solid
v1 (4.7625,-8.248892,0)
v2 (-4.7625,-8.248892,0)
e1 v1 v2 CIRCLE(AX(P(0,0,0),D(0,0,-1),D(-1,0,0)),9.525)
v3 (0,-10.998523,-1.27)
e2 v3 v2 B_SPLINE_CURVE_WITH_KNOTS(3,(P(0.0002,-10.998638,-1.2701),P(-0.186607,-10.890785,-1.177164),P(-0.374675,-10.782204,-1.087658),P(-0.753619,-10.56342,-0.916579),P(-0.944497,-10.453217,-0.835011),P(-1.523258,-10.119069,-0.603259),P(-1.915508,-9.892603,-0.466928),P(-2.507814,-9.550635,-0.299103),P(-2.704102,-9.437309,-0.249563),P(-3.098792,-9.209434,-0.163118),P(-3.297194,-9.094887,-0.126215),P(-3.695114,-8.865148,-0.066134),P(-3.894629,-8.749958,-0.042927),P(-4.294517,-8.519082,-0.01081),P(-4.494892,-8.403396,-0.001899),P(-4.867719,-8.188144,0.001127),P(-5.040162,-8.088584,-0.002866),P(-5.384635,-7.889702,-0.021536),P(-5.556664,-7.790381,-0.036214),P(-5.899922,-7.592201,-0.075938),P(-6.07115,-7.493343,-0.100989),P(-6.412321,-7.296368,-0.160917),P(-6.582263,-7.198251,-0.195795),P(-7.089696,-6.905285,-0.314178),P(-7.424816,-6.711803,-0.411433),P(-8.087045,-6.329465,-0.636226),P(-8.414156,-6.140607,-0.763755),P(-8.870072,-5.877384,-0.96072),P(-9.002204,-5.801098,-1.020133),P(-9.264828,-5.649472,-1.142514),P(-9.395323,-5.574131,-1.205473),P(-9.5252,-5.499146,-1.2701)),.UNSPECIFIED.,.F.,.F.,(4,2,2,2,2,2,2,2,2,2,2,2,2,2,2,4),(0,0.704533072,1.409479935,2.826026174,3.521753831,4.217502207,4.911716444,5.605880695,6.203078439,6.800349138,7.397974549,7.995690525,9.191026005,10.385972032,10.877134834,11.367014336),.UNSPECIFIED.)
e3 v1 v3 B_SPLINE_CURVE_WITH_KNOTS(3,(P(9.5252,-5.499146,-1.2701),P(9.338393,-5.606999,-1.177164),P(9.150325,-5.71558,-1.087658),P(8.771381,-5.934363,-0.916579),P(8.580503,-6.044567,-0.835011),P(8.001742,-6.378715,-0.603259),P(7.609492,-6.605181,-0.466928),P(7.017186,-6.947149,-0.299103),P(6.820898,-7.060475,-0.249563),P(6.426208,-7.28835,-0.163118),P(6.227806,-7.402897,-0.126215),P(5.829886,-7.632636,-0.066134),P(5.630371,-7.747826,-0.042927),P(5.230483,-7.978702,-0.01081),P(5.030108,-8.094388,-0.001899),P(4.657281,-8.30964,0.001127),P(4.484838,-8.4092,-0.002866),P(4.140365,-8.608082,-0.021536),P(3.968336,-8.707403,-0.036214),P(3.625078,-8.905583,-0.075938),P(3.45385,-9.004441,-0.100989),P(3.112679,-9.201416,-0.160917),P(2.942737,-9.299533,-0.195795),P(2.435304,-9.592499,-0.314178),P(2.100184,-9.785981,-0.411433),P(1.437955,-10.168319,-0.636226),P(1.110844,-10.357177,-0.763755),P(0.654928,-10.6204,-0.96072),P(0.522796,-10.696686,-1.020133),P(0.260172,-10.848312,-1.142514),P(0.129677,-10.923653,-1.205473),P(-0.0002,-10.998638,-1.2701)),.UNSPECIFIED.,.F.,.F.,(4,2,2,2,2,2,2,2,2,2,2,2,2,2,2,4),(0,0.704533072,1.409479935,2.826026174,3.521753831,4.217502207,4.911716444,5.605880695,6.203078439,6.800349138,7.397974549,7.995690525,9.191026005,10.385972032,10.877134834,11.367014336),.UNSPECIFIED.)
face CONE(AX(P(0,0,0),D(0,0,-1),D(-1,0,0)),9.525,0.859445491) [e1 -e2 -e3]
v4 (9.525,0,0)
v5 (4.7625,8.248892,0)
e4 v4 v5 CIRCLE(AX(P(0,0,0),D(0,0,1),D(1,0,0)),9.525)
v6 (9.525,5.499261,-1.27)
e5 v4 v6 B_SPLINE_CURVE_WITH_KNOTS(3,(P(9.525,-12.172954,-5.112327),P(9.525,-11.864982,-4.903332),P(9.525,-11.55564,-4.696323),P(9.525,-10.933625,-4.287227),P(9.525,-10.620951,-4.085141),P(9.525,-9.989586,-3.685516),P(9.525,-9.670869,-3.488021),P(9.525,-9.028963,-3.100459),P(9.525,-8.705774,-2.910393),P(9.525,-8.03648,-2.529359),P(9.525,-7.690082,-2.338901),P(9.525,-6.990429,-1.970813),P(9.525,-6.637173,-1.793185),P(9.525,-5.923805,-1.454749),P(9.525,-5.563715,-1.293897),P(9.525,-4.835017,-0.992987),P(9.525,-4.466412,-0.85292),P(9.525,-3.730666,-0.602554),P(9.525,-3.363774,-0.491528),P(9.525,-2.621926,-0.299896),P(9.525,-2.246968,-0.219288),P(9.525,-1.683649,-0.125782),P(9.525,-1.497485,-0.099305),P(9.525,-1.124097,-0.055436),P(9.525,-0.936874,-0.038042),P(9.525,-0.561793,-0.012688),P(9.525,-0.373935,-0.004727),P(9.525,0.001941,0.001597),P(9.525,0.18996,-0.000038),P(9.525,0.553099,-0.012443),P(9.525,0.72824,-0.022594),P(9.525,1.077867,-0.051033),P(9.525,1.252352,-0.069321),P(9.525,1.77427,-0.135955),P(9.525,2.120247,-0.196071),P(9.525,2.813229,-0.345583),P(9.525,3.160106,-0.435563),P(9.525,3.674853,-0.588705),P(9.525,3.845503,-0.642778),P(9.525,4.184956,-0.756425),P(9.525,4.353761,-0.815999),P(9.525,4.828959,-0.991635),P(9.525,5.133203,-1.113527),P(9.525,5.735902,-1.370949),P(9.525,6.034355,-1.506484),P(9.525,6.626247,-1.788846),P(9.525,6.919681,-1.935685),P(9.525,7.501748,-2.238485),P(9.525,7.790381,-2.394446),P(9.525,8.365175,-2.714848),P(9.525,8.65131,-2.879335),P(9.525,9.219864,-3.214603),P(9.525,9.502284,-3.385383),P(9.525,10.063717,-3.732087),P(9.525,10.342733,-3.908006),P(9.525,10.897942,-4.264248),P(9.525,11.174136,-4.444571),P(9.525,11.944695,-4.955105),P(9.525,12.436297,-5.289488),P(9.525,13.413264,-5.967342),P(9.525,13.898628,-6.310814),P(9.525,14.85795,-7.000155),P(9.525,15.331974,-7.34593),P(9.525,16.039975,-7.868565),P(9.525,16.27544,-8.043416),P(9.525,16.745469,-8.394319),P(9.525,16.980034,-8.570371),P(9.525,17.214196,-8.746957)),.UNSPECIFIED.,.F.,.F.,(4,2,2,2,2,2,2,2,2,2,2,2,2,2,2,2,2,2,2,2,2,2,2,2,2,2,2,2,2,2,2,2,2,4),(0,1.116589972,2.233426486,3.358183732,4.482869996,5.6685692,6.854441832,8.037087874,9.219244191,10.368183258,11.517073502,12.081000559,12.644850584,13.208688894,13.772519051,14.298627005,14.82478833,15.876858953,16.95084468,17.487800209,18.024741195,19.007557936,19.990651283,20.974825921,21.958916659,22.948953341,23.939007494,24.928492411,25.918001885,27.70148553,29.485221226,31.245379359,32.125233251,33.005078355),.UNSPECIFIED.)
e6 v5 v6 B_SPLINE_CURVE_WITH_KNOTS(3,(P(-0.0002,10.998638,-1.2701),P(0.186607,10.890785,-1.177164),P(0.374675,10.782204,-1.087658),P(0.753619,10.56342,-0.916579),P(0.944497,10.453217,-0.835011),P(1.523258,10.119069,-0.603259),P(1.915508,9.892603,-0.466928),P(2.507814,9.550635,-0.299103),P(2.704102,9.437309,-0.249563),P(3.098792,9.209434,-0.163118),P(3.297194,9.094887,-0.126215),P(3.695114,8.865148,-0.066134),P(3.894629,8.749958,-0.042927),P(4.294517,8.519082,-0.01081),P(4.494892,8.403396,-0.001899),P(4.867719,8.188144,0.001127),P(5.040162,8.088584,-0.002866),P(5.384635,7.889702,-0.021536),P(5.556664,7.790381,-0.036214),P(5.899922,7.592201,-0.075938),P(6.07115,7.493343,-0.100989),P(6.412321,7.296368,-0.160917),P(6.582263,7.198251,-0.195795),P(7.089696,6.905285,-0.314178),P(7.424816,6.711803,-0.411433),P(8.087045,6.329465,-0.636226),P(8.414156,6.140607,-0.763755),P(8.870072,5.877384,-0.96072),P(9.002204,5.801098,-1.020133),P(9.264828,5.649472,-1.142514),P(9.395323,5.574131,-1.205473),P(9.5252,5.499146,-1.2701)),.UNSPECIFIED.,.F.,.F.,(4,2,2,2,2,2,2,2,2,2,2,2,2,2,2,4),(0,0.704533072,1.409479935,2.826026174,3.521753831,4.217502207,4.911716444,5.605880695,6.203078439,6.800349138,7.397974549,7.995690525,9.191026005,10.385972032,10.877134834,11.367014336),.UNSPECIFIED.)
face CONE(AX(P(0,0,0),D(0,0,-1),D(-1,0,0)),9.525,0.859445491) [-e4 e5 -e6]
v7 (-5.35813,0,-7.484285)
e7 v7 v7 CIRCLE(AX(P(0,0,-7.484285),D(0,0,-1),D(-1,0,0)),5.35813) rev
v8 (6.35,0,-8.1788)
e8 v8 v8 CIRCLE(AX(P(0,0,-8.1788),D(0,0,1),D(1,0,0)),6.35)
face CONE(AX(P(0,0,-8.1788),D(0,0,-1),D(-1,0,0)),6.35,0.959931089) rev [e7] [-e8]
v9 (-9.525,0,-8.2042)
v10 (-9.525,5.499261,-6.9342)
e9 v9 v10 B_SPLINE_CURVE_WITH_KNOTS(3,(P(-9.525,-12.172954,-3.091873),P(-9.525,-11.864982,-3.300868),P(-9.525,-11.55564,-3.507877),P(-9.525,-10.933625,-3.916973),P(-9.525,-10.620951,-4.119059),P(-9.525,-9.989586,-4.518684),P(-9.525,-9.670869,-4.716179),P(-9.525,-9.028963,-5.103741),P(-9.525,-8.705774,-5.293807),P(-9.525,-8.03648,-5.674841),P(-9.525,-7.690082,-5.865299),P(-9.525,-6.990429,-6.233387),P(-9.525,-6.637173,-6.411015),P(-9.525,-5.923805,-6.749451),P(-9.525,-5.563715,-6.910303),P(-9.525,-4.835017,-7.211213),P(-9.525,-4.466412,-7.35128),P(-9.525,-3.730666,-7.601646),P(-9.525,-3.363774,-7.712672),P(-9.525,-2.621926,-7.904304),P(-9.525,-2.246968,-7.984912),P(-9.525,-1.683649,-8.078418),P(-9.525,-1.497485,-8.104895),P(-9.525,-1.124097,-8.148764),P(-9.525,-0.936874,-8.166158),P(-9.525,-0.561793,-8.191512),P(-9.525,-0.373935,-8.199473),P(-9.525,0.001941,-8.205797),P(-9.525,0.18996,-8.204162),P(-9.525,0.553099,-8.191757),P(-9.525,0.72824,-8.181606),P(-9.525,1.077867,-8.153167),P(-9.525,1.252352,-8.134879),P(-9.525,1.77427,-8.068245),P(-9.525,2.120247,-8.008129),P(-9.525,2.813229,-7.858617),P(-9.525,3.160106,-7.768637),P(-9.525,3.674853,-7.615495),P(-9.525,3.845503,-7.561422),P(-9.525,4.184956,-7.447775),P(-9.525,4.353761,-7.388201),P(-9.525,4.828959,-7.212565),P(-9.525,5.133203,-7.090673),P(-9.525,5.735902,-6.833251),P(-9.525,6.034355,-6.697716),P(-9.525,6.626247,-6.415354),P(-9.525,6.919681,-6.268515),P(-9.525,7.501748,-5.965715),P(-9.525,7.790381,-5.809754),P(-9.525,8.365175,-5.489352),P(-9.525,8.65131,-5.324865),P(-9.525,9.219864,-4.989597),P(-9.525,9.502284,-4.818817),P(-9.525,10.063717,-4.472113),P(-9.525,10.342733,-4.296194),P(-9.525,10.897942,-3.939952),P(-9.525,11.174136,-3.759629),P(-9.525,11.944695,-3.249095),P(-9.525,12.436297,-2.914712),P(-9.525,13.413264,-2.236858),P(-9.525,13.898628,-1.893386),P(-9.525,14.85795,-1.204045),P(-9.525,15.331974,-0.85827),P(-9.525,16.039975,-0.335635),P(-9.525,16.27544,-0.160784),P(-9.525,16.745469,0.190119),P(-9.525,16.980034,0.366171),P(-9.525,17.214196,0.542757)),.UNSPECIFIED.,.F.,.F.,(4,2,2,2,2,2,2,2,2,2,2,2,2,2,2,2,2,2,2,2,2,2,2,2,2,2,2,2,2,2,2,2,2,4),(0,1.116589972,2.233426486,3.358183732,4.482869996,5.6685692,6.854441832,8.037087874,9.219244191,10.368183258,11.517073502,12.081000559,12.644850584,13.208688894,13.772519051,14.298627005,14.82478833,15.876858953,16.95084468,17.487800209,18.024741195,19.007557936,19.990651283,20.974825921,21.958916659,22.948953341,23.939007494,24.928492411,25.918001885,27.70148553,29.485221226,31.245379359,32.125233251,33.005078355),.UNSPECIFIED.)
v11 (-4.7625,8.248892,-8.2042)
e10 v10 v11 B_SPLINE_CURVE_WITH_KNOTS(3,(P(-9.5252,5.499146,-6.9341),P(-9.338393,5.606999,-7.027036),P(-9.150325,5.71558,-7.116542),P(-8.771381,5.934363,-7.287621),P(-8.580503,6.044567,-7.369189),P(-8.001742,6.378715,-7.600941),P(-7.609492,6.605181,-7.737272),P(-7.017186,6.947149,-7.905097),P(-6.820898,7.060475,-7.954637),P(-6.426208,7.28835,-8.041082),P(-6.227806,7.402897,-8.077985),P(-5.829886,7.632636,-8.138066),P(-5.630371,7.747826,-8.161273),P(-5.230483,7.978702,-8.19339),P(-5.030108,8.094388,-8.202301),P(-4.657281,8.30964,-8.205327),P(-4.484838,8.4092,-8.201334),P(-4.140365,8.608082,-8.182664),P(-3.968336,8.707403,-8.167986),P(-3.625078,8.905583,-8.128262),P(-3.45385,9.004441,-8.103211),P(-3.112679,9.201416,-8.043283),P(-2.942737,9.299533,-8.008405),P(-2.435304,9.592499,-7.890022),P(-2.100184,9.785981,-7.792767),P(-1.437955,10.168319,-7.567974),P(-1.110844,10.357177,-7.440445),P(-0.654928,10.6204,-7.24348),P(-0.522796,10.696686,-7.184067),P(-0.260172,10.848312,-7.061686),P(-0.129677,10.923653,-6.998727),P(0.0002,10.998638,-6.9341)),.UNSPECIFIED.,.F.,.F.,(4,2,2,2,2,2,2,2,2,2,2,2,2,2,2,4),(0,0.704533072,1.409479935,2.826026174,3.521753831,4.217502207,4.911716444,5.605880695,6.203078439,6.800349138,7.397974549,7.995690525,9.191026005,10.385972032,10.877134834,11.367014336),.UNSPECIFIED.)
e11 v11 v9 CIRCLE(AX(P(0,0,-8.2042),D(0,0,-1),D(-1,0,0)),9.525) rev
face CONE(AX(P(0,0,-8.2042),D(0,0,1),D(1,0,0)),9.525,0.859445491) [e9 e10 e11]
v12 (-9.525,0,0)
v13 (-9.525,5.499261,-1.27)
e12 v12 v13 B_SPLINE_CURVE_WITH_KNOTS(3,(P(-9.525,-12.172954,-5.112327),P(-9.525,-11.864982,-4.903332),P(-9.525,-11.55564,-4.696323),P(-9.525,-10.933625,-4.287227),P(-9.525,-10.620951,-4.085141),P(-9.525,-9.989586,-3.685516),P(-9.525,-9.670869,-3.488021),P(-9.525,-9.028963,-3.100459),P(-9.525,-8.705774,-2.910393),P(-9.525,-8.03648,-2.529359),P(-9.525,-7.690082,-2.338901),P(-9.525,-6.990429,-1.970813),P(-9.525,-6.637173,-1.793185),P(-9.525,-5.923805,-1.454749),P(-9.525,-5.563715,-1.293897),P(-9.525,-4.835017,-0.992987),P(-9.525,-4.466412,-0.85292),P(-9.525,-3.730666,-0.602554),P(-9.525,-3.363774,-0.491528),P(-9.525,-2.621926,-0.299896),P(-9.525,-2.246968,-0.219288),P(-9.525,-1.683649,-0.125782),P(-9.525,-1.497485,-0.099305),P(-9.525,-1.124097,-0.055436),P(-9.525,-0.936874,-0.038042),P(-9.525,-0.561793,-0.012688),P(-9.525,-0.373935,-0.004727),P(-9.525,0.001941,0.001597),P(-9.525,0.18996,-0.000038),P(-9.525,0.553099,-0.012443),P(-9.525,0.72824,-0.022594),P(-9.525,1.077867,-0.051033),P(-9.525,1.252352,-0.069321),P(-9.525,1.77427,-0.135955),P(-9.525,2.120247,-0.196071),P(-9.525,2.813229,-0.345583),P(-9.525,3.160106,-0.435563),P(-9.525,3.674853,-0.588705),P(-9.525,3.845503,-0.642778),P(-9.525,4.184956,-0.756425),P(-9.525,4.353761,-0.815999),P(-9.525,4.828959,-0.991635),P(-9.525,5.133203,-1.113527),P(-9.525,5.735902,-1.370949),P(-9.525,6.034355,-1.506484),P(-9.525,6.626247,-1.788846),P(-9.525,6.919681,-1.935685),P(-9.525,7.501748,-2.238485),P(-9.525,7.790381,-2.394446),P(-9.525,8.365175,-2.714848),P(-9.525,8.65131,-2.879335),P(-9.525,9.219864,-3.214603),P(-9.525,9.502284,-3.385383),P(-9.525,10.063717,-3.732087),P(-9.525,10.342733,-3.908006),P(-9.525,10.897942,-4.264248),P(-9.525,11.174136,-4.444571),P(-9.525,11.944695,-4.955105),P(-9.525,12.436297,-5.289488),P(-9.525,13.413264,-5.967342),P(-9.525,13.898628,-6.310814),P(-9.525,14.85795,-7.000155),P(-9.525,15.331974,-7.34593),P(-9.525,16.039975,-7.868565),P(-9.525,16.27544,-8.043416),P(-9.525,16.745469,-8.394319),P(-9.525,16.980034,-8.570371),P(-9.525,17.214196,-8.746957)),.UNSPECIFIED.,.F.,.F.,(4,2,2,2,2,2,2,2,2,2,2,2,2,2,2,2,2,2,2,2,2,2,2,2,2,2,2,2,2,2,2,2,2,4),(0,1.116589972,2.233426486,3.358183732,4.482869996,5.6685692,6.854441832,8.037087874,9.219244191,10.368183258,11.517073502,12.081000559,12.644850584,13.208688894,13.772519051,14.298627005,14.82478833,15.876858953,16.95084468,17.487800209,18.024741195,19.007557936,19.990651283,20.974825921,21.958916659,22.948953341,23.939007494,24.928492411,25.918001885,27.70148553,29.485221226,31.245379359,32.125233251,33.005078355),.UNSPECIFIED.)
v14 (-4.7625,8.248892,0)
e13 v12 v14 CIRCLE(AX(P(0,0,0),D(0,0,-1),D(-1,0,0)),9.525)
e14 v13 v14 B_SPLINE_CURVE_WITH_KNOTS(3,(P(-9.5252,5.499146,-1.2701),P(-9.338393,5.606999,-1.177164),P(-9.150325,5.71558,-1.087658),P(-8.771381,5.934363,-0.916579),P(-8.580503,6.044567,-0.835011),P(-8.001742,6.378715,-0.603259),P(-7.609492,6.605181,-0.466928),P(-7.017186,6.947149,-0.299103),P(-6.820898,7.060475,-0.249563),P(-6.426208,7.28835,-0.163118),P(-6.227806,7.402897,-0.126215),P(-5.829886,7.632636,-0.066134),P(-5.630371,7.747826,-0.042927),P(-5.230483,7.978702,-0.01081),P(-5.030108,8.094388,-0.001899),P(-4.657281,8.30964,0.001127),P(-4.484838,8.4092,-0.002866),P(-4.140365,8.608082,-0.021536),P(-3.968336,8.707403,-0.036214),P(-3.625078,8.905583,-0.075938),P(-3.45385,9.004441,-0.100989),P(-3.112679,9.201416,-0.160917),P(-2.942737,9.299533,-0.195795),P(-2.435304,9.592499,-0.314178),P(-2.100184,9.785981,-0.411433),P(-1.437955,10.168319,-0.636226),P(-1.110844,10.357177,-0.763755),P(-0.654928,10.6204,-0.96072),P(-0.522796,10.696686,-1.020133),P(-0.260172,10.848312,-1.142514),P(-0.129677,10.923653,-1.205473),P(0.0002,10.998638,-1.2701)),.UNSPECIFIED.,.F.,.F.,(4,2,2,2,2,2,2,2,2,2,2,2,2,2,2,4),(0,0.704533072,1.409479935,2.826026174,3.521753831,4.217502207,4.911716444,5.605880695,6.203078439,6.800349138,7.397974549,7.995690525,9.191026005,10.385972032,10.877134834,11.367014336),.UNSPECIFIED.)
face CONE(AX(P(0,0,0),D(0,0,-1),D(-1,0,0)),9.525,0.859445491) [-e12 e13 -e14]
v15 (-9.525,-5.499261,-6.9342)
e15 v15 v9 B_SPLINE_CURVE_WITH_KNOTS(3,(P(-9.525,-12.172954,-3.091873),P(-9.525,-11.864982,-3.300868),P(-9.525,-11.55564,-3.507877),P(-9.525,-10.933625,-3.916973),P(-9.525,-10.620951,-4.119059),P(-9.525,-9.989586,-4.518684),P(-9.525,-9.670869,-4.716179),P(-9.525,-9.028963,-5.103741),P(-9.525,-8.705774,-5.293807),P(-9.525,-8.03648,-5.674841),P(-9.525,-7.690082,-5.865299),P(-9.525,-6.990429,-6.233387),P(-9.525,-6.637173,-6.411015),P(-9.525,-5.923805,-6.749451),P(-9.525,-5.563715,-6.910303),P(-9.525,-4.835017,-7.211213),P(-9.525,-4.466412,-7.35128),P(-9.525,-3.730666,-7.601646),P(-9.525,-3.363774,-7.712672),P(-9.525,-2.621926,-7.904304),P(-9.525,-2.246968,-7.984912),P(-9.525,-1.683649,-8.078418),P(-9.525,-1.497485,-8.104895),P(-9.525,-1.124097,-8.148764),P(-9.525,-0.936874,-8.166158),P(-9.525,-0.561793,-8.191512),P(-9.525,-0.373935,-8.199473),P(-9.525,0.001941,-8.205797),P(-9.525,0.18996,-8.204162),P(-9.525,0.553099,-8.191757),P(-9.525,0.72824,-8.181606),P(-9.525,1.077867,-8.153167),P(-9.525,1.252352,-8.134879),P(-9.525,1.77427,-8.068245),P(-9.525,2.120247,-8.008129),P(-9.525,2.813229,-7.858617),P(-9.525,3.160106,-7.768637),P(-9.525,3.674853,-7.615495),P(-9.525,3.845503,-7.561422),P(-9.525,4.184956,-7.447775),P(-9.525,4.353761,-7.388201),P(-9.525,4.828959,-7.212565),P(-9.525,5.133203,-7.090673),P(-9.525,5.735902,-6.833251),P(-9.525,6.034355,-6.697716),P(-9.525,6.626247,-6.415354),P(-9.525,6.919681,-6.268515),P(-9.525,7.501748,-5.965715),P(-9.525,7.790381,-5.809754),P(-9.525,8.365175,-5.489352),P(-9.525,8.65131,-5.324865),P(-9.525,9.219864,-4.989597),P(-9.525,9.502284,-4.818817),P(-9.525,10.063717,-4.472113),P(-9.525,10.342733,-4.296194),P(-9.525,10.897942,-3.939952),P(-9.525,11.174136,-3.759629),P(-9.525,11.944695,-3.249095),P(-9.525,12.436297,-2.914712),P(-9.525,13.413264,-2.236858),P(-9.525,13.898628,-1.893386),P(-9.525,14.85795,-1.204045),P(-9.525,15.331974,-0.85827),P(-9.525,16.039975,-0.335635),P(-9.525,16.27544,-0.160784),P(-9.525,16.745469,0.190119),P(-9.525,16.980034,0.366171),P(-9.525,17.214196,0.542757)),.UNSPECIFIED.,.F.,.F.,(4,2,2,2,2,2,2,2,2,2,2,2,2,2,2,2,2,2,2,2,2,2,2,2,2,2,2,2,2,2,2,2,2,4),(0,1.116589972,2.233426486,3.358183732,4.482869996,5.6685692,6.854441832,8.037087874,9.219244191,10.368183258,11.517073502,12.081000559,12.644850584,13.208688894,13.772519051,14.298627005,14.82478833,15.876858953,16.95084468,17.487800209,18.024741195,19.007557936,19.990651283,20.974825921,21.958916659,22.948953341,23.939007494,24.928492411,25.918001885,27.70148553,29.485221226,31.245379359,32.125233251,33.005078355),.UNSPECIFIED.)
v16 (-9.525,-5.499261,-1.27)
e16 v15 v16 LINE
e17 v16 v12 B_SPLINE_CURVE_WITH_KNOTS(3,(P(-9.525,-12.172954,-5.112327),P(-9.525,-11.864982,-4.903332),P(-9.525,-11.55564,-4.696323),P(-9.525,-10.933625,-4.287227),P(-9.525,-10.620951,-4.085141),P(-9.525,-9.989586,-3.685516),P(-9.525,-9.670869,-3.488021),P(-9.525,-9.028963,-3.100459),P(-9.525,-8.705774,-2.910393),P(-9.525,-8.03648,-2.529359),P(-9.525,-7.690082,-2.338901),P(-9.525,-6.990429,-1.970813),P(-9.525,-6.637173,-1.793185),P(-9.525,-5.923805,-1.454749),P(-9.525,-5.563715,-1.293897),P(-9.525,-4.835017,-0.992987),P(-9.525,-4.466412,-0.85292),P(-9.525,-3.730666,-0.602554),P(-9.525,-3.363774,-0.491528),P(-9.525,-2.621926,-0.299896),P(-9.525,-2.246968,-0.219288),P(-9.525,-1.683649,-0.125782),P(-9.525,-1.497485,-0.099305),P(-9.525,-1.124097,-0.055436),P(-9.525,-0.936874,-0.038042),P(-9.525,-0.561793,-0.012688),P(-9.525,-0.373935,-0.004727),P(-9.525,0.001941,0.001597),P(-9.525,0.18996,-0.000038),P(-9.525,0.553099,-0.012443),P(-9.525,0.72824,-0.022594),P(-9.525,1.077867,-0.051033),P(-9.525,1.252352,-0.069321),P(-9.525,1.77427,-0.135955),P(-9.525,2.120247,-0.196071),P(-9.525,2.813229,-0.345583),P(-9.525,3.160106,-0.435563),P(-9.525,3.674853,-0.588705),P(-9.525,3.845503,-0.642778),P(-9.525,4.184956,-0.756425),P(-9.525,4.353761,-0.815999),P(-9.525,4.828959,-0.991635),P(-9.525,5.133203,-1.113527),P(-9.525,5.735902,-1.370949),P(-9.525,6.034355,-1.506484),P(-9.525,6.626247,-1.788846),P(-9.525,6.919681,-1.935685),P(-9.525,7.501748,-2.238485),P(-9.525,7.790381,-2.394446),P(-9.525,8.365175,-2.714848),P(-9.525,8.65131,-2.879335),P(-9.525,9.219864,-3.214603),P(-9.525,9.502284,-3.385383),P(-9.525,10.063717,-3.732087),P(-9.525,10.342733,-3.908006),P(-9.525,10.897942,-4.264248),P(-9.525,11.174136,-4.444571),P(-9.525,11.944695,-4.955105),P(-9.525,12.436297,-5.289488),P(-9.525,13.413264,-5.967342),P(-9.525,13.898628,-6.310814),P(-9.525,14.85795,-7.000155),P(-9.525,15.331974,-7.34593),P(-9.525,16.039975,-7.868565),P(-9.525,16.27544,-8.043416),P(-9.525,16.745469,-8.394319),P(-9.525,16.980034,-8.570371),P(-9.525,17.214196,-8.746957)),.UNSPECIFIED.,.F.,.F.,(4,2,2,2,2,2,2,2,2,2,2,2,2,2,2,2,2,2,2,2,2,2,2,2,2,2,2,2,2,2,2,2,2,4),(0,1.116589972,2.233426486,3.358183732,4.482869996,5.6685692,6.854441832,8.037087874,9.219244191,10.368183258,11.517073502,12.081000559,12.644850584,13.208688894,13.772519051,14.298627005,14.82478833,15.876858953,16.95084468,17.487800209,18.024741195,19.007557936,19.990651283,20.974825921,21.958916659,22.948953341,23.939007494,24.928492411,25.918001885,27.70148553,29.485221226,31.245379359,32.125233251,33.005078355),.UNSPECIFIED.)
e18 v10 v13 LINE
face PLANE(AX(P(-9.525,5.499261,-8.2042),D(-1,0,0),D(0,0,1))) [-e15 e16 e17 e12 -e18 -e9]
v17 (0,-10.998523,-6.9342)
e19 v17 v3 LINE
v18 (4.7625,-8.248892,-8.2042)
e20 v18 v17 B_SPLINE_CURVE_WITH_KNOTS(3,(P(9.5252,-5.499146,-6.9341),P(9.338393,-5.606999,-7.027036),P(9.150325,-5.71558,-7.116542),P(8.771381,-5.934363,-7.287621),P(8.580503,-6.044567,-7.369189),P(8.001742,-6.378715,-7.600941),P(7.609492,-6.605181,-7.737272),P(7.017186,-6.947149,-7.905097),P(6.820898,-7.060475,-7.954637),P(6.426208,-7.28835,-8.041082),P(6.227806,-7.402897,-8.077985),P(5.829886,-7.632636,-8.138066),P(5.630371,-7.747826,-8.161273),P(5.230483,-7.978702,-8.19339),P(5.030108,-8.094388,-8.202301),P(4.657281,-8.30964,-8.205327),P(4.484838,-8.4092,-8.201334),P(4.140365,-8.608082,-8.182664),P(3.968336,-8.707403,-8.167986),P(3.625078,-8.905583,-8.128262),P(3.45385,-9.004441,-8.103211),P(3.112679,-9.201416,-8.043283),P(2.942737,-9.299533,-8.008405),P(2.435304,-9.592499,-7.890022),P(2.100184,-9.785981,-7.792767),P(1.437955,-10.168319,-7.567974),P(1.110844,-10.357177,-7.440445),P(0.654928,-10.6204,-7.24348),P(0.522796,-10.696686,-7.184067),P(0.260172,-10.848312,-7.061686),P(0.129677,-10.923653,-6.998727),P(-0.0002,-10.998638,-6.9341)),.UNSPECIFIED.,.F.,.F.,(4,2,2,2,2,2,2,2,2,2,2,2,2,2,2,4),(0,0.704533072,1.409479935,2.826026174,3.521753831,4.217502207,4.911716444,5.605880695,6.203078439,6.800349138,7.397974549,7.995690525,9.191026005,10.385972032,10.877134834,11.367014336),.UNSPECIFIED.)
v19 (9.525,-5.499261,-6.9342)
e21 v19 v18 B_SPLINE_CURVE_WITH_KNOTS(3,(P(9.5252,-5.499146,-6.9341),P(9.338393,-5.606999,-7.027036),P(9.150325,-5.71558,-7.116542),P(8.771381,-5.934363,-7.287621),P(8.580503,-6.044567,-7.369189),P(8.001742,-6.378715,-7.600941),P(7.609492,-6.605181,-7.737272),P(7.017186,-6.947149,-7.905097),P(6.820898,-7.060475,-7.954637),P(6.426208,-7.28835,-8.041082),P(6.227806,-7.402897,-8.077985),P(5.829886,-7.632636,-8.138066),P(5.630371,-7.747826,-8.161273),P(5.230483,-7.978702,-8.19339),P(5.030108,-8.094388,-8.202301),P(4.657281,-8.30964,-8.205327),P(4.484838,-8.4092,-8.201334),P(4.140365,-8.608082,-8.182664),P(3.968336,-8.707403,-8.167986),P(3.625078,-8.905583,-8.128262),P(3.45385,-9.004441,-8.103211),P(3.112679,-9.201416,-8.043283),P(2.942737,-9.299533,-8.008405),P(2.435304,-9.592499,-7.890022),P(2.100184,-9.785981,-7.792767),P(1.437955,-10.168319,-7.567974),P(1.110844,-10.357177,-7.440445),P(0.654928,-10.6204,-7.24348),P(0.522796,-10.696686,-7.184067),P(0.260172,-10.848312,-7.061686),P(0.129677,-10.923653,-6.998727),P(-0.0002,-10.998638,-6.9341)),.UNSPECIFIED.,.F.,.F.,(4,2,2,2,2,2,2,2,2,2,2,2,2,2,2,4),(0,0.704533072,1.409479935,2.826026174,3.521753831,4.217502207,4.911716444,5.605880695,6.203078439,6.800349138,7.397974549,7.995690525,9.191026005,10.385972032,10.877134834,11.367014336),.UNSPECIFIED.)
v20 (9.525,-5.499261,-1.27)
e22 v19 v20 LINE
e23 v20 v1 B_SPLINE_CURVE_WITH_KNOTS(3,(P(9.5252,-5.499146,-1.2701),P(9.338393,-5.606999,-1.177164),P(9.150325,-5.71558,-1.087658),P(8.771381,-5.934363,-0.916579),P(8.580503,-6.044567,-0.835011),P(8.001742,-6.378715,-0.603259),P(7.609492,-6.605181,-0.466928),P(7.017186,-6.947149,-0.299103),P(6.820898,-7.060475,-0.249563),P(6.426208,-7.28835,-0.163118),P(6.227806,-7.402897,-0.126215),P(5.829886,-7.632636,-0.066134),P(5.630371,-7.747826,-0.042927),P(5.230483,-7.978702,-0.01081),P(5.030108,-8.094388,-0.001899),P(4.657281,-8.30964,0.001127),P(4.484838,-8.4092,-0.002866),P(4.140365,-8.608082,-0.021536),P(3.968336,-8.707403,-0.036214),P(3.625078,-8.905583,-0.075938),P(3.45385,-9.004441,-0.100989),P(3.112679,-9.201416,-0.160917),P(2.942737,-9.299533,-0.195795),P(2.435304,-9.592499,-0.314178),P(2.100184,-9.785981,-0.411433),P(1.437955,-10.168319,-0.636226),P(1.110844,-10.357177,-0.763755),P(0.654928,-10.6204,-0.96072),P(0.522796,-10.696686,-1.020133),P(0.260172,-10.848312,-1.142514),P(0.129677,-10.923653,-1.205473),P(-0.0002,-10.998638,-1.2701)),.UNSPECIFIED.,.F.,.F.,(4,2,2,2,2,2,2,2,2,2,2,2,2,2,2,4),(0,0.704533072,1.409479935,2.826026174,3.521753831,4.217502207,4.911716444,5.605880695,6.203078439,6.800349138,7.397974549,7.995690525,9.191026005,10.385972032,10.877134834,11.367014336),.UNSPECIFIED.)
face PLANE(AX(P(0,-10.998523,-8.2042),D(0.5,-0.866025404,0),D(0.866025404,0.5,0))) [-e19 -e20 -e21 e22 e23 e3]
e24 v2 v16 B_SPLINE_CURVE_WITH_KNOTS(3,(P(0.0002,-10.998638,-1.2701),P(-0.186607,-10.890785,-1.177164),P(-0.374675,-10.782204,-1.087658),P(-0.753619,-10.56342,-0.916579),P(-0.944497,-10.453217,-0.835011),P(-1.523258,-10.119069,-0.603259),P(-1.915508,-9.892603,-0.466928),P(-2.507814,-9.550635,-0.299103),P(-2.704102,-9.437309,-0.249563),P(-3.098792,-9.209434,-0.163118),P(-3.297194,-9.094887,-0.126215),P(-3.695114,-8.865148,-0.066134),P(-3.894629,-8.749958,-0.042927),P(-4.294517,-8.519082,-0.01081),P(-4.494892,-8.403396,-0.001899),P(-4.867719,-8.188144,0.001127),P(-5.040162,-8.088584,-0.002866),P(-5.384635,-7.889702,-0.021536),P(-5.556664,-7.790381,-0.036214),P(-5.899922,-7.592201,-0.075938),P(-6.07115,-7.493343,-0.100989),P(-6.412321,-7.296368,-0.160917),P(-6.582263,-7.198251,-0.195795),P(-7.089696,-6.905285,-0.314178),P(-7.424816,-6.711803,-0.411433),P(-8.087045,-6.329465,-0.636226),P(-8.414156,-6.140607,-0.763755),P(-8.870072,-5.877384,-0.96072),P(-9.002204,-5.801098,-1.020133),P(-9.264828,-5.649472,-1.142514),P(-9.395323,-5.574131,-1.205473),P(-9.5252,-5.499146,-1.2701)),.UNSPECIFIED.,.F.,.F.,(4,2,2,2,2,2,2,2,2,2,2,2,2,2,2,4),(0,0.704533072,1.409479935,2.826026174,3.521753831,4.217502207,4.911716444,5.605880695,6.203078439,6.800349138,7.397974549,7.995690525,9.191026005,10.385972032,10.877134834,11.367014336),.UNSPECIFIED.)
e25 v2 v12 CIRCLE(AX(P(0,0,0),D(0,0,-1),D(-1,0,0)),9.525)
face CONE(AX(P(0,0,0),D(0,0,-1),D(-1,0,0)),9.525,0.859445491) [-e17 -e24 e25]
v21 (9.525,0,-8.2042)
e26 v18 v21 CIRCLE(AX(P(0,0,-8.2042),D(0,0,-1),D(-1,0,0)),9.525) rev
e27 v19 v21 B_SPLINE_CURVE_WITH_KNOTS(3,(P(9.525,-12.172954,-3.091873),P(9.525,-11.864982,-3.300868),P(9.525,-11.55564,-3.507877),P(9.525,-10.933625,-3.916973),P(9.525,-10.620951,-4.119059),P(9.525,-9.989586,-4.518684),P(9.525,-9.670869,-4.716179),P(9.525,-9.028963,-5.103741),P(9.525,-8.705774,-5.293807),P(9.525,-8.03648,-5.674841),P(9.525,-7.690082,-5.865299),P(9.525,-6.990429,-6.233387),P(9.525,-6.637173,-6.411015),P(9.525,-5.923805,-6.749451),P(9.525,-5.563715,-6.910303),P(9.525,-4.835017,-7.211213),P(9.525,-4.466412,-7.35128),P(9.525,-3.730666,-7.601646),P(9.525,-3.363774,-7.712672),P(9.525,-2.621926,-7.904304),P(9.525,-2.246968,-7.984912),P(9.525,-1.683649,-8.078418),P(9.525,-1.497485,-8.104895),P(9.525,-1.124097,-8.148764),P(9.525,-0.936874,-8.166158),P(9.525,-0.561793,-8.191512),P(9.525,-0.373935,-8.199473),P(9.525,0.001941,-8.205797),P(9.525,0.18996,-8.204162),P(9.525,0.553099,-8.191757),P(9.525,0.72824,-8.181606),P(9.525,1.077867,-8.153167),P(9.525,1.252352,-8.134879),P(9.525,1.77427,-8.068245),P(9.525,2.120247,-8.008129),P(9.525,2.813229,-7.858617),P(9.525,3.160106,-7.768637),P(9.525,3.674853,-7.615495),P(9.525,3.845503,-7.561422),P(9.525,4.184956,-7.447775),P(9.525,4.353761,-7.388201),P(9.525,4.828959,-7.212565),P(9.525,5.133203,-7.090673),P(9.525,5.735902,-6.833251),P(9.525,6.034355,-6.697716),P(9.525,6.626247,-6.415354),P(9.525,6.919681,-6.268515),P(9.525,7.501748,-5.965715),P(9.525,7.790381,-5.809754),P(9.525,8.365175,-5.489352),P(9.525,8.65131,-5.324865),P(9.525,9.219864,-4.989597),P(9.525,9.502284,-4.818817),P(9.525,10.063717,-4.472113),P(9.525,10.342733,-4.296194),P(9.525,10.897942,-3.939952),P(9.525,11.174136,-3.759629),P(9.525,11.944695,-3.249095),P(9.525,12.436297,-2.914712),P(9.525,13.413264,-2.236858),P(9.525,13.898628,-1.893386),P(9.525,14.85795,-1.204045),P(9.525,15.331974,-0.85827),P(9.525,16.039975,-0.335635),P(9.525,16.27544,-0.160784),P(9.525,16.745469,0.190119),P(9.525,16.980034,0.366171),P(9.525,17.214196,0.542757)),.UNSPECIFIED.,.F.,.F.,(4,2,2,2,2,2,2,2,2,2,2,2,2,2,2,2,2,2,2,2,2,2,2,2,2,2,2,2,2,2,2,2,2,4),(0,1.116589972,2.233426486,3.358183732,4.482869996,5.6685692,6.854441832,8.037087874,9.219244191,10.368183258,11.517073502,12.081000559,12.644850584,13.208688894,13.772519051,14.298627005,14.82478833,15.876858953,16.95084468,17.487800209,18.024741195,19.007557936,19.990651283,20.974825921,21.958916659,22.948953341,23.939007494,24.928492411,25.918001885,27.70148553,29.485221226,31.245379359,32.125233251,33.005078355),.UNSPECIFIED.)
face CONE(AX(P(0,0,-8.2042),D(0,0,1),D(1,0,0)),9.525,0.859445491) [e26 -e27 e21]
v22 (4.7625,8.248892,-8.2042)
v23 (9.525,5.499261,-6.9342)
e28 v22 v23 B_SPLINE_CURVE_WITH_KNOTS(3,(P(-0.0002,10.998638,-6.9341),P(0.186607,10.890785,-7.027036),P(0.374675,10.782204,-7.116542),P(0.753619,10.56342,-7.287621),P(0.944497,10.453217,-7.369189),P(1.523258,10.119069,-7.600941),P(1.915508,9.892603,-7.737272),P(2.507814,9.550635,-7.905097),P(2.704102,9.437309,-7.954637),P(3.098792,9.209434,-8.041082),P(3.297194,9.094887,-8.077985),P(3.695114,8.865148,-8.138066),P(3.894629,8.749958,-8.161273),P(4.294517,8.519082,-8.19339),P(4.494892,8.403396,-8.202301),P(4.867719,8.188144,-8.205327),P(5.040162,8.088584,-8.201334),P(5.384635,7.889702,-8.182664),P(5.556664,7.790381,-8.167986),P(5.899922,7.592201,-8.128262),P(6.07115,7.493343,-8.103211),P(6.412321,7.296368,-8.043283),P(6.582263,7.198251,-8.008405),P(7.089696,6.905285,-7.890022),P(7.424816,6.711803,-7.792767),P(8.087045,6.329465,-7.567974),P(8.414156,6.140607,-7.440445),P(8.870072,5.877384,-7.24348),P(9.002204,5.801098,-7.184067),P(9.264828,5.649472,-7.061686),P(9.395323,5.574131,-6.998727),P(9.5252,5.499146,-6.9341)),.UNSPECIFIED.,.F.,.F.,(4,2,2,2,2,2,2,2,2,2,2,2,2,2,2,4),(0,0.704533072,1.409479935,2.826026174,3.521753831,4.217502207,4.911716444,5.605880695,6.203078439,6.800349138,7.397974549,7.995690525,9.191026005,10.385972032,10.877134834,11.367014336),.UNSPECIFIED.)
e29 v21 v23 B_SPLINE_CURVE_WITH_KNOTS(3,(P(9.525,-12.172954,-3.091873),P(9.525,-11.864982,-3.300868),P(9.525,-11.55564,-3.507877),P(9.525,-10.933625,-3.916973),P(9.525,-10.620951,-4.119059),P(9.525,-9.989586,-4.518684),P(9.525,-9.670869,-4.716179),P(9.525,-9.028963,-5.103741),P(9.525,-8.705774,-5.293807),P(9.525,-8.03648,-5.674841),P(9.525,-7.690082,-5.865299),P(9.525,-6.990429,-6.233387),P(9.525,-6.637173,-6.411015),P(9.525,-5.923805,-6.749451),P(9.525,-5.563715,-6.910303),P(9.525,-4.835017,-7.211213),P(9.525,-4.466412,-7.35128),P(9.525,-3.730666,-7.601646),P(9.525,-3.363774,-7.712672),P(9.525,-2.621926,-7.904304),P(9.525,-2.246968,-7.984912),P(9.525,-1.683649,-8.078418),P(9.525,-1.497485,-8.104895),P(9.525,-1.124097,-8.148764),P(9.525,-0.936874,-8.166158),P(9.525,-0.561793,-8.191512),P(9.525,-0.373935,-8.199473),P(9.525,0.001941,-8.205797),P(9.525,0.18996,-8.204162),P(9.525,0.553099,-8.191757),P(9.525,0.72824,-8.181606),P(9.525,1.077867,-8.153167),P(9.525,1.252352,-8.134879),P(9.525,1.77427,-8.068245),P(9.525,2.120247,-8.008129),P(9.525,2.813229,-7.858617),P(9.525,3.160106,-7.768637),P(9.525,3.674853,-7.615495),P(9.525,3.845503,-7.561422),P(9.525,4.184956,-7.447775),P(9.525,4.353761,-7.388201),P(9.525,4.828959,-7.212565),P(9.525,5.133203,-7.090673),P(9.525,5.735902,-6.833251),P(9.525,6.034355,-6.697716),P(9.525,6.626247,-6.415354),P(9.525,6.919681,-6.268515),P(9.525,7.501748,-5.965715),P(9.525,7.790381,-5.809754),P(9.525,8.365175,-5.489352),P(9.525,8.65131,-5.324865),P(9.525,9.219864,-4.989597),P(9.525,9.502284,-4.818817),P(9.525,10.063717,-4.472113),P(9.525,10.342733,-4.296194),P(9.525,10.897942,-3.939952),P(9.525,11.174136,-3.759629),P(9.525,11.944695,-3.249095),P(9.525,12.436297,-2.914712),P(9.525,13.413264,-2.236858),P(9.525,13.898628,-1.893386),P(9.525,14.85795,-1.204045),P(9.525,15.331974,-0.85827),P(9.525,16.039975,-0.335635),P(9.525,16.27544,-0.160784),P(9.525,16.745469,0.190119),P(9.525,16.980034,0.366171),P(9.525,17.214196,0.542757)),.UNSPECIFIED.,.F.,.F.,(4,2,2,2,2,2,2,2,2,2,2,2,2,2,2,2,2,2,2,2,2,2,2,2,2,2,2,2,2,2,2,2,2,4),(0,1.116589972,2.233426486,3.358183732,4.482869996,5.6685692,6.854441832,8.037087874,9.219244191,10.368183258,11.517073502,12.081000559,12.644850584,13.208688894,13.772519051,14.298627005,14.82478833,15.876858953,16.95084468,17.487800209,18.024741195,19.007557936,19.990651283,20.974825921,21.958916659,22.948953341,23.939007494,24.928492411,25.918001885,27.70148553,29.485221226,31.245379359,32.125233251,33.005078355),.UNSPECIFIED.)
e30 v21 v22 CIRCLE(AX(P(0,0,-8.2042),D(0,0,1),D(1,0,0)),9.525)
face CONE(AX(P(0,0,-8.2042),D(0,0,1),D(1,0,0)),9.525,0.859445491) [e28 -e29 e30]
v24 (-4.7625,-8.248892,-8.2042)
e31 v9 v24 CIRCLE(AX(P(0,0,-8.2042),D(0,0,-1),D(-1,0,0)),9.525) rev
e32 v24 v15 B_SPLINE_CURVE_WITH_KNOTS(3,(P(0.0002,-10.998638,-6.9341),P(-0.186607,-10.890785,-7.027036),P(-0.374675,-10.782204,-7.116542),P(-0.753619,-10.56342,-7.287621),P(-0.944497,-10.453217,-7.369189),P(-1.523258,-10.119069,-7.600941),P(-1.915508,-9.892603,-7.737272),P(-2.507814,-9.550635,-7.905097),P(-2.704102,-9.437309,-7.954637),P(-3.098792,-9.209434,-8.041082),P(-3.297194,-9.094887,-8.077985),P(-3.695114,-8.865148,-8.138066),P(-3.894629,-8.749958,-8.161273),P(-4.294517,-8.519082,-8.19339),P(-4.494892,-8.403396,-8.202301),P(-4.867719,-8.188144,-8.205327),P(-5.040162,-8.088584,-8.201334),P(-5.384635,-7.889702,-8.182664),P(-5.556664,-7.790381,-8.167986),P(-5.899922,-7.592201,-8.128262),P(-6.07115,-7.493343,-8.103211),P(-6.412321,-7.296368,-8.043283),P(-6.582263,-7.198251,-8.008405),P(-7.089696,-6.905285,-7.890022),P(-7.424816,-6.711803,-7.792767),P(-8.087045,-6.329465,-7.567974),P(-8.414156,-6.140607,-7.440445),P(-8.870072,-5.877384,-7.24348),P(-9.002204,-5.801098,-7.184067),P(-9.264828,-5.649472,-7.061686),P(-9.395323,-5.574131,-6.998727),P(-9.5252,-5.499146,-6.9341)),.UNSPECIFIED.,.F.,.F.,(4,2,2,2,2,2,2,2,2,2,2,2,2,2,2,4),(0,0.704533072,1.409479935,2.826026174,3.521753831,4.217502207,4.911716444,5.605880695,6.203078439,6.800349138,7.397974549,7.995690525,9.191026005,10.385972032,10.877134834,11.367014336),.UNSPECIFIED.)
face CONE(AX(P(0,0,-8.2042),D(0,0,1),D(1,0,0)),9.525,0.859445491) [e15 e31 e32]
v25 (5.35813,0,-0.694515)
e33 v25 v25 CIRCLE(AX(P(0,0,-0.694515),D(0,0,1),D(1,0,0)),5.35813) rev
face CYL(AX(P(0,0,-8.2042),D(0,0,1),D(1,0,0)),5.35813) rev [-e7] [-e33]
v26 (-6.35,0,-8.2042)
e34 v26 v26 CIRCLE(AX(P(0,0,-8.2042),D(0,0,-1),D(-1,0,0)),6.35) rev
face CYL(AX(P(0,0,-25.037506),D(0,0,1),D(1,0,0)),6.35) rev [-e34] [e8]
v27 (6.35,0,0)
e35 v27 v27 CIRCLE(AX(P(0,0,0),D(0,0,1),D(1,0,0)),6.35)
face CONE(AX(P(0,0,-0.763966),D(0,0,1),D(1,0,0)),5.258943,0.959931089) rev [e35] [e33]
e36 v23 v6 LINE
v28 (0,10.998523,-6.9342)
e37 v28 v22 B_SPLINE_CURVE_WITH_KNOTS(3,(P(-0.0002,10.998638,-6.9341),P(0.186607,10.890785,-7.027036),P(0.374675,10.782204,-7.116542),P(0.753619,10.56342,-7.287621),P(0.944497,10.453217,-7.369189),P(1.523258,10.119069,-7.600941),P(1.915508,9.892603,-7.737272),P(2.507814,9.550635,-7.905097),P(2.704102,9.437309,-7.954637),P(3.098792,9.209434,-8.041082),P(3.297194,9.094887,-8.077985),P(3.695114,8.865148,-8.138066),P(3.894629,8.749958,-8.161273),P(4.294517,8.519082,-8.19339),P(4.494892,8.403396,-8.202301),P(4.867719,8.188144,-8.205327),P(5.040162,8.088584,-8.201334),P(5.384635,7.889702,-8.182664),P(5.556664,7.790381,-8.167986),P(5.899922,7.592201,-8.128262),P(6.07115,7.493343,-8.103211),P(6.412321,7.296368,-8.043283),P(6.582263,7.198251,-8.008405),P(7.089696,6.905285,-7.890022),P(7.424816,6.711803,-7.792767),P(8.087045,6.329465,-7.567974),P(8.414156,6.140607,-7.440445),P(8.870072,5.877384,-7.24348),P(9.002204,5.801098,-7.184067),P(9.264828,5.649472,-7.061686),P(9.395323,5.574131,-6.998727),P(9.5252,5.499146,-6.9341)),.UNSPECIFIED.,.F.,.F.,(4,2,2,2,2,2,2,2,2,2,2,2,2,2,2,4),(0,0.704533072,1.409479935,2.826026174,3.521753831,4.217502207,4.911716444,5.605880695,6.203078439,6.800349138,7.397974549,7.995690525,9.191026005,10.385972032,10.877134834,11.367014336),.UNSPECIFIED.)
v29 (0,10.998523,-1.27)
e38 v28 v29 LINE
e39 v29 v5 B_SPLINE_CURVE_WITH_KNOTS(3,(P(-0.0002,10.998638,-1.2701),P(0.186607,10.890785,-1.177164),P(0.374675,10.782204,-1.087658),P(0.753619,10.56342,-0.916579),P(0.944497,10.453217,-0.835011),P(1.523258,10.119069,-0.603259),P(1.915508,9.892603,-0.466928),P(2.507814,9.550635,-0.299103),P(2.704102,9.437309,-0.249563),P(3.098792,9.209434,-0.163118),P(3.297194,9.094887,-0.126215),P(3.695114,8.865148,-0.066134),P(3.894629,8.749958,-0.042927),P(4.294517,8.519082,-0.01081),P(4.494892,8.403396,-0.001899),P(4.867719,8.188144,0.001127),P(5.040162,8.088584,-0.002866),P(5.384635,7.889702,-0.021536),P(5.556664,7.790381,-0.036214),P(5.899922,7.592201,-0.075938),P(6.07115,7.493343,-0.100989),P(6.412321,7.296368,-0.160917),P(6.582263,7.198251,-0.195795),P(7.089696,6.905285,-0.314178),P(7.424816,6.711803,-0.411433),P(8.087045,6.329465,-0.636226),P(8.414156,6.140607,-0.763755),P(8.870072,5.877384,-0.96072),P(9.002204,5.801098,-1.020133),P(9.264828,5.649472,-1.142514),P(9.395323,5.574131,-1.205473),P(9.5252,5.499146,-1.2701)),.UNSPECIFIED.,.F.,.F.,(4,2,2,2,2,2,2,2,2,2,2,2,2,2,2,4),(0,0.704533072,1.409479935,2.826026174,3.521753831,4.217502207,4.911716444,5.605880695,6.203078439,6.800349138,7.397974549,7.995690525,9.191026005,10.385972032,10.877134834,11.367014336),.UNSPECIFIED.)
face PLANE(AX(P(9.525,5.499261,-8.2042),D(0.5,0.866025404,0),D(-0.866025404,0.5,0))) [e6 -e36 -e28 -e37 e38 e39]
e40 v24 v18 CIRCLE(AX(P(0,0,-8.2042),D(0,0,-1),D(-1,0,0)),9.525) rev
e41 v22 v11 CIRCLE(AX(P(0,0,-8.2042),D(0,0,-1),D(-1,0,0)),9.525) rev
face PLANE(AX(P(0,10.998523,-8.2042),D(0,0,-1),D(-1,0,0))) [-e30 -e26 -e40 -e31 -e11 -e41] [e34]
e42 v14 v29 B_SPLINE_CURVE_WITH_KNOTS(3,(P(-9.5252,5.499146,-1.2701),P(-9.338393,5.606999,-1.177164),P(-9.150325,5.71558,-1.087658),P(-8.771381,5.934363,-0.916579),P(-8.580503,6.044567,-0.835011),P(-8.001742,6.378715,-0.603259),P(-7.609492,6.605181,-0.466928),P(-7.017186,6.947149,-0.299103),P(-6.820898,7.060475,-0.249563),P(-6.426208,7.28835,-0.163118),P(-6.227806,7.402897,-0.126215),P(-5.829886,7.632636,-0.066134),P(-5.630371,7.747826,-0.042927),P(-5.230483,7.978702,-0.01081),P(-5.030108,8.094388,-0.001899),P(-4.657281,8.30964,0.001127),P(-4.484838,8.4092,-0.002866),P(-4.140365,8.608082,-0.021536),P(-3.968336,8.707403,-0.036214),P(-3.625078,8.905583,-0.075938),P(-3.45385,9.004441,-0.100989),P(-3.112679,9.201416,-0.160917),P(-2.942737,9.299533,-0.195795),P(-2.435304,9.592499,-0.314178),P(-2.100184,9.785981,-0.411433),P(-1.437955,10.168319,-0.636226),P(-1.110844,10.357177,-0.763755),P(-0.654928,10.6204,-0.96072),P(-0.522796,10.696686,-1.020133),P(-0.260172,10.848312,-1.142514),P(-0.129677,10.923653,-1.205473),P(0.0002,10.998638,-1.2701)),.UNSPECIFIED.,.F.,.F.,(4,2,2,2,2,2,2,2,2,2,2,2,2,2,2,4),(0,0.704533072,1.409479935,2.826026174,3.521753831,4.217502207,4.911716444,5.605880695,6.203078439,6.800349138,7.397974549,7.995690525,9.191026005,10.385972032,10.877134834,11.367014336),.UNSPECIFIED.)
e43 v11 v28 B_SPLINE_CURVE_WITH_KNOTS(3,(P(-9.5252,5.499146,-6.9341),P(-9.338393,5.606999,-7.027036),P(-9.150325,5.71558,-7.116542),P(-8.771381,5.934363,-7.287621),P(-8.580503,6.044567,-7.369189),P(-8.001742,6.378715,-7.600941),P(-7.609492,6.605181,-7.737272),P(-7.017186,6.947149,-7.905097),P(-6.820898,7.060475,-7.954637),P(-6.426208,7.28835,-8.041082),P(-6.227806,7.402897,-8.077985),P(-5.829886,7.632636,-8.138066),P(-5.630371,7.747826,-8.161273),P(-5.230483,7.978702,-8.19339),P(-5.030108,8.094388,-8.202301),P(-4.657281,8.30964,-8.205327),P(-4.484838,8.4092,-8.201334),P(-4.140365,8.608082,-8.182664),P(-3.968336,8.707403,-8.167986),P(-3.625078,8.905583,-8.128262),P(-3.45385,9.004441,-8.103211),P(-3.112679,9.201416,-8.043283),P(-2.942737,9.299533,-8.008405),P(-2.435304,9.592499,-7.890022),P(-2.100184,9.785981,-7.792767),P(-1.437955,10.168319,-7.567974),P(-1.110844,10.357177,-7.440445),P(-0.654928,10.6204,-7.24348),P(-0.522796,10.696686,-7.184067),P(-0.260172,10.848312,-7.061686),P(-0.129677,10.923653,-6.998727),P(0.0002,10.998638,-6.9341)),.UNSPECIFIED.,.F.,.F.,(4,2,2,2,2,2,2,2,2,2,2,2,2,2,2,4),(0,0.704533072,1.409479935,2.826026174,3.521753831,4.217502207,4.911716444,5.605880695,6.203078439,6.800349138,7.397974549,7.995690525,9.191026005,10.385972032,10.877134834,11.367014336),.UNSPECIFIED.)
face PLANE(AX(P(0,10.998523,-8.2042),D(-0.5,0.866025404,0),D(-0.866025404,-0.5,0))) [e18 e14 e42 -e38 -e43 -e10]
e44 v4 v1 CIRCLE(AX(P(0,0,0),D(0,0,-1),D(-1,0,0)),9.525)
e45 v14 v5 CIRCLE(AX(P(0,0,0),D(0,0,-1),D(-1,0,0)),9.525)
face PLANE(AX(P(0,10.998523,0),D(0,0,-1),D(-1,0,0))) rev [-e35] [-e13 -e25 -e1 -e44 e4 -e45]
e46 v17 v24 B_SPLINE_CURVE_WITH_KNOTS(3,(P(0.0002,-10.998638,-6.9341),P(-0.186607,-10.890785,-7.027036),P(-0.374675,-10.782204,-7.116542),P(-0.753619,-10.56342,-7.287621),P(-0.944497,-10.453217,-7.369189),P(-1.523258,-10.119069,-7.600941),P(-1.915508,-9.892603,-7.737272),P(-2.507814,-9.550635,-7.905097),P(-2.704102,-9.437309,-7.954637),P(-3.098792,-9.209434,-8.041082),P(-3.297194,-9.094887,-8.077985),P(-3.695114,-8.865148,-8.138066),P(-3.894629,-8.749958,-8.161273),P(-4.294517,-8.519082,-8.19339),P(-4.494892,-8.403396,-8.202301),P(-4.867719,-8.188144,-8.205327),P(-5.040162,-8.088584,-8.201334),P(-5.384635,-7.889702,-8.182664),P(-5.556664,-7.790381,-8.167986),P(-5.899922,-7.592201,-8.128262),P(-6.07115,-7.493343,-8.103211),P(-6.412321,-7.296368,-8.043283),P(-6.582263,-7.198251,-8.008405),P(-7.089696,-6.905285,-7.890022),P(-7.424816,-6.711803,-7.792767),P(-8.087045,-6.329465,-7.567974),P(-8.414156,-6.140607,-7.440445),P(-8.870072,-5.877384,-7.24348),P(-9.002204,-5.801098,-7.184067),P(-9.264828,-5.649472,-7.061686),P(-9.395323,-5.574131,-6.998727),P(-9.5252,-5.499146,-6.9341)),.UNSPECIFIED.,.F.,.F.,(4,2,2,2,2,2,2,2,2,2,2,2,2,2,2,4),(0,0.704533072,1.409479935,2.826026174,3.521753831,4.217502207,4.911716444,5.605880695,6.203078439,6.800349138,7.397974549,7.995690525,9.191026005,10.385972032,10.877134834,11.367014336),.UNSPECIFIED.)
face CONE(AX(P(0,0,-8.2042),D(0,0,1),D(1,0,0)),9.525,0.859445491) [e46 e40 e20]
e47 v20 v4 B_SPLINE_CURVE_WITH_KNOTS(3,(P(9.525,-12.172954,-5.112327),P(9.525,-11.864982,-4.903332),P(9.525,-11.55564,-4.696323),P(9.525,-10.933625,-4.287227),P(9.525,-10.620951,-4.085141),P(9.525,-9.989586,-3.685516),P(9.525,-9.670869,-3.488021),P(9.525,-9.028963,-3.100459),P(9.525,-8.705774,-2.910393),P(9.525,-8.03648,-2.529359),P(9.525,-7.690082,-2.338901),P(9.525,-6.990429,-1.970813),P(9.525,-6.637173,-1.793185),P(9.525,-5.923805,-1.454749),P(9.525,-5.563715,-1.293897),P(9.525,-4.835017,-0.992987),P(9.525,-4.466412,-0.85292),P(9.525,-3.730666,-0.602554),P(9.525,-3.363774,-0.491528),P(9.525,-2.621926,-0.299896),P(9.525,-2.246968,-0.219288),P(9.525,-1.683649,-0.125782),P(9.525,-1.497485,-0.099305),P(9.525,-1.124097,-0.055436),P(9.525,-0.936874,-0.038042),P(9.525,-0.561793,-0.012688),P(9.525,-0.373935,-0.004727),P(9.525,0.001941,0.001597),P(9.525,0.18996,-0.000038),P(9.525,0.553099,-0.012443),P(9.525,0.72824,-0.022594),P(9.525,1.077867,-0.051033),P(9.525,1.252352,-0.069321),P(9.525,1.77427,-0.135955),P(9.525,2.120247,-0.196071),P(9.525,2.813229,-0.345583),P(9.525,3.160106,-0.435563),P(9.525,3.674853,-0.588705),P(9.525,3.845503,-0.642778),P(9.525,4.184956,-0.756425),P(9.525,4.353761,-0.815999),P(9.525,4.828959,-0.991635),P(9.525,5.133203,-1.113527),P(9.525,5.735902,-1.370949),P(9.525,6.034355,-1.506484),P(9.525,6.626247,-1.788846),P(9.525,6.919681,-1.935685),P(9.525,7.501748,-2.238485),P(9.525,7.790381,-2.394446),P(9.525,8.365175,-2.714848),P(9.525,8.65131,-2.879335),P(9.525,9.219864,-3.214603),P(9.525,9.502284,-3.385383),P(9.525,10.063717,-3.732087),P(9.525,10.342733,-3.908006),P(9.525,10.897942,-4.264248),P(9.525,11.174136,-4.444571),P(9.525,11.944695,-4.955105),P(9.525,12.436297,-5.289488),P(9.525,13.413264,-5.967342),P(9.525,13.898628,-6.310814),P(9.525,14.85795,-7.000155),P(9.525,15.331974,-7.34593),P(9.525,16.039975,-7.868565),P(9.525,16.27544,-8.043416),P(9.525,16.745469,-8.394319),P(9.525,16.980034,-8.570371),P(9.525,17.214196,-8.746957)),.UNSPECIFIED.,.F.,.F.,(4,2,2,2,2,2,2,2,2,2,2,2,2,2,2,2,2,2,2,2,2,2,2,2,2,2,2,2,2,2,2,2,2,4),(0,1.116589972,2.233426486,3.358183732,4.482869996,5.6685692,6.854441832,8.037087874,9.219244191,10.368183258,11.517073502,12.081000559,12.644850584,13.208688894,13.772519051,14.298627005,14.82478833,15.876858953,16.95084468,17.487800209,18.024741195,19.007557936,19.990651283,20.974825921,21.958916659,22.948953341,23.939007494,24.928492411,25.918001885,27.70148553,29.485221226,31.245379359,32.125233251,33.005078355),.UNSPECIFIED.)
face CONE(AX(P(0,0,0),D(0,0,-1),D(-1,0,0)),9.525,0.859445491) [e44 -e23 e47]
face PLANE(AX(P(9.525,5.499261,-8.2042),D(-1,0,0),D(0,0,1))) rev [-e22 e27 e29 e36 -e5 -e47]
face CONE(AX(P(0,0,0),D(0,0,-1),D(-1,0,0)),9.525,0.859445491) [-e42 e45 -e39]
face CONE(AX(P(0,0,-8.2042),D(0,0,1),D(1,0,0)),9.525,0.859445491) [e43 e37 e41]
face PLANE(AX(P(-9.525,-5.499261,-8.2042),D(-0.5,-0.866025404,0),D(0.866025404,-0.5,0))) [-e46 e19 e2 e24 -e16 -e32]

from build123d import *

# Parameters (mm, degrees)
THREADSCHEMATIC_START     = -8.2042
THREADSCHEMATIC_OUTLINE_R = 5.35813
THREADSCHEMATIC_DEPTH     = 8.2042


# Read off the part's stored shape, not the designer's step: ThreadSchematic
with BuildPart() as part:
    # ThreadSchematic outline → ThreadSchematic (new body)
    with BuildSketch(Plane.XY.offset(THREADSCHEMATIC_START)):
        Polygon((9.525, 5.499261314), (0, 10.998522628), (-9.525, 5.499261314), (-9.525, -5.499261314), (0, -10.998522628), (9.525, -5.499261314), align=None)
        Circle(THREADSCHEMATIC_OUTLINE_R, mode=Mode.SUBTRACT)
    extrude(amount=THREADSCHEMATIC_DEPTH)

    # Sketch3 → Double-Chamfer (revolve, cut)
    with BuildSketch(Plane(origin=(0, 0, 0), x_dir=(0, 0, -1), z_dir=(1, 0, 0))):
        Polygon((8.2042, 9.525), (6.9342, 10.998522628), (6.9342, 23.698522628), (20.9042, 23.698522628), (20.9042, 9.525), align=None)
        Polygon((1.27, 23.698522628), (-12.7, 23.698522628), (-12.7, 9.525), (0, 9.525), (1.27, 10.998522628), align=None)
    revolve(axis=Axis((0, 0, 0), (0, 0, -1)), mode=Mode.SUBTRACT)

    # EndChamferSke → EndChamfer (revolve, cut)
    with BuildSketch(Plane(origin=(0, 0, 0), x_dir=(0, 0, -1), z_dir=(1, 0, 0)), mode=Mode.PRIVATE) as endchamfer_sk:
        Polygon((8.1788, 6.35), (7.414833664, 5.258943), (8.2296, 5.258943), (8.2296, 6.35), align=None)
        Polygon((-0.0508, 6.35), (0, 6.35), (0.763966336, 5.258943), (-0.0508, 5.258943), align=None)
    revolve(endchamfer_sk.sketch.rotate(Axis((0, 0, -25.037505729), (0, 0, -1)), 90), axis=Axis((0, 0, -25.037505729), (0, 0, -1)), mode=Mode.SUBTRACT)


solid = part.part
